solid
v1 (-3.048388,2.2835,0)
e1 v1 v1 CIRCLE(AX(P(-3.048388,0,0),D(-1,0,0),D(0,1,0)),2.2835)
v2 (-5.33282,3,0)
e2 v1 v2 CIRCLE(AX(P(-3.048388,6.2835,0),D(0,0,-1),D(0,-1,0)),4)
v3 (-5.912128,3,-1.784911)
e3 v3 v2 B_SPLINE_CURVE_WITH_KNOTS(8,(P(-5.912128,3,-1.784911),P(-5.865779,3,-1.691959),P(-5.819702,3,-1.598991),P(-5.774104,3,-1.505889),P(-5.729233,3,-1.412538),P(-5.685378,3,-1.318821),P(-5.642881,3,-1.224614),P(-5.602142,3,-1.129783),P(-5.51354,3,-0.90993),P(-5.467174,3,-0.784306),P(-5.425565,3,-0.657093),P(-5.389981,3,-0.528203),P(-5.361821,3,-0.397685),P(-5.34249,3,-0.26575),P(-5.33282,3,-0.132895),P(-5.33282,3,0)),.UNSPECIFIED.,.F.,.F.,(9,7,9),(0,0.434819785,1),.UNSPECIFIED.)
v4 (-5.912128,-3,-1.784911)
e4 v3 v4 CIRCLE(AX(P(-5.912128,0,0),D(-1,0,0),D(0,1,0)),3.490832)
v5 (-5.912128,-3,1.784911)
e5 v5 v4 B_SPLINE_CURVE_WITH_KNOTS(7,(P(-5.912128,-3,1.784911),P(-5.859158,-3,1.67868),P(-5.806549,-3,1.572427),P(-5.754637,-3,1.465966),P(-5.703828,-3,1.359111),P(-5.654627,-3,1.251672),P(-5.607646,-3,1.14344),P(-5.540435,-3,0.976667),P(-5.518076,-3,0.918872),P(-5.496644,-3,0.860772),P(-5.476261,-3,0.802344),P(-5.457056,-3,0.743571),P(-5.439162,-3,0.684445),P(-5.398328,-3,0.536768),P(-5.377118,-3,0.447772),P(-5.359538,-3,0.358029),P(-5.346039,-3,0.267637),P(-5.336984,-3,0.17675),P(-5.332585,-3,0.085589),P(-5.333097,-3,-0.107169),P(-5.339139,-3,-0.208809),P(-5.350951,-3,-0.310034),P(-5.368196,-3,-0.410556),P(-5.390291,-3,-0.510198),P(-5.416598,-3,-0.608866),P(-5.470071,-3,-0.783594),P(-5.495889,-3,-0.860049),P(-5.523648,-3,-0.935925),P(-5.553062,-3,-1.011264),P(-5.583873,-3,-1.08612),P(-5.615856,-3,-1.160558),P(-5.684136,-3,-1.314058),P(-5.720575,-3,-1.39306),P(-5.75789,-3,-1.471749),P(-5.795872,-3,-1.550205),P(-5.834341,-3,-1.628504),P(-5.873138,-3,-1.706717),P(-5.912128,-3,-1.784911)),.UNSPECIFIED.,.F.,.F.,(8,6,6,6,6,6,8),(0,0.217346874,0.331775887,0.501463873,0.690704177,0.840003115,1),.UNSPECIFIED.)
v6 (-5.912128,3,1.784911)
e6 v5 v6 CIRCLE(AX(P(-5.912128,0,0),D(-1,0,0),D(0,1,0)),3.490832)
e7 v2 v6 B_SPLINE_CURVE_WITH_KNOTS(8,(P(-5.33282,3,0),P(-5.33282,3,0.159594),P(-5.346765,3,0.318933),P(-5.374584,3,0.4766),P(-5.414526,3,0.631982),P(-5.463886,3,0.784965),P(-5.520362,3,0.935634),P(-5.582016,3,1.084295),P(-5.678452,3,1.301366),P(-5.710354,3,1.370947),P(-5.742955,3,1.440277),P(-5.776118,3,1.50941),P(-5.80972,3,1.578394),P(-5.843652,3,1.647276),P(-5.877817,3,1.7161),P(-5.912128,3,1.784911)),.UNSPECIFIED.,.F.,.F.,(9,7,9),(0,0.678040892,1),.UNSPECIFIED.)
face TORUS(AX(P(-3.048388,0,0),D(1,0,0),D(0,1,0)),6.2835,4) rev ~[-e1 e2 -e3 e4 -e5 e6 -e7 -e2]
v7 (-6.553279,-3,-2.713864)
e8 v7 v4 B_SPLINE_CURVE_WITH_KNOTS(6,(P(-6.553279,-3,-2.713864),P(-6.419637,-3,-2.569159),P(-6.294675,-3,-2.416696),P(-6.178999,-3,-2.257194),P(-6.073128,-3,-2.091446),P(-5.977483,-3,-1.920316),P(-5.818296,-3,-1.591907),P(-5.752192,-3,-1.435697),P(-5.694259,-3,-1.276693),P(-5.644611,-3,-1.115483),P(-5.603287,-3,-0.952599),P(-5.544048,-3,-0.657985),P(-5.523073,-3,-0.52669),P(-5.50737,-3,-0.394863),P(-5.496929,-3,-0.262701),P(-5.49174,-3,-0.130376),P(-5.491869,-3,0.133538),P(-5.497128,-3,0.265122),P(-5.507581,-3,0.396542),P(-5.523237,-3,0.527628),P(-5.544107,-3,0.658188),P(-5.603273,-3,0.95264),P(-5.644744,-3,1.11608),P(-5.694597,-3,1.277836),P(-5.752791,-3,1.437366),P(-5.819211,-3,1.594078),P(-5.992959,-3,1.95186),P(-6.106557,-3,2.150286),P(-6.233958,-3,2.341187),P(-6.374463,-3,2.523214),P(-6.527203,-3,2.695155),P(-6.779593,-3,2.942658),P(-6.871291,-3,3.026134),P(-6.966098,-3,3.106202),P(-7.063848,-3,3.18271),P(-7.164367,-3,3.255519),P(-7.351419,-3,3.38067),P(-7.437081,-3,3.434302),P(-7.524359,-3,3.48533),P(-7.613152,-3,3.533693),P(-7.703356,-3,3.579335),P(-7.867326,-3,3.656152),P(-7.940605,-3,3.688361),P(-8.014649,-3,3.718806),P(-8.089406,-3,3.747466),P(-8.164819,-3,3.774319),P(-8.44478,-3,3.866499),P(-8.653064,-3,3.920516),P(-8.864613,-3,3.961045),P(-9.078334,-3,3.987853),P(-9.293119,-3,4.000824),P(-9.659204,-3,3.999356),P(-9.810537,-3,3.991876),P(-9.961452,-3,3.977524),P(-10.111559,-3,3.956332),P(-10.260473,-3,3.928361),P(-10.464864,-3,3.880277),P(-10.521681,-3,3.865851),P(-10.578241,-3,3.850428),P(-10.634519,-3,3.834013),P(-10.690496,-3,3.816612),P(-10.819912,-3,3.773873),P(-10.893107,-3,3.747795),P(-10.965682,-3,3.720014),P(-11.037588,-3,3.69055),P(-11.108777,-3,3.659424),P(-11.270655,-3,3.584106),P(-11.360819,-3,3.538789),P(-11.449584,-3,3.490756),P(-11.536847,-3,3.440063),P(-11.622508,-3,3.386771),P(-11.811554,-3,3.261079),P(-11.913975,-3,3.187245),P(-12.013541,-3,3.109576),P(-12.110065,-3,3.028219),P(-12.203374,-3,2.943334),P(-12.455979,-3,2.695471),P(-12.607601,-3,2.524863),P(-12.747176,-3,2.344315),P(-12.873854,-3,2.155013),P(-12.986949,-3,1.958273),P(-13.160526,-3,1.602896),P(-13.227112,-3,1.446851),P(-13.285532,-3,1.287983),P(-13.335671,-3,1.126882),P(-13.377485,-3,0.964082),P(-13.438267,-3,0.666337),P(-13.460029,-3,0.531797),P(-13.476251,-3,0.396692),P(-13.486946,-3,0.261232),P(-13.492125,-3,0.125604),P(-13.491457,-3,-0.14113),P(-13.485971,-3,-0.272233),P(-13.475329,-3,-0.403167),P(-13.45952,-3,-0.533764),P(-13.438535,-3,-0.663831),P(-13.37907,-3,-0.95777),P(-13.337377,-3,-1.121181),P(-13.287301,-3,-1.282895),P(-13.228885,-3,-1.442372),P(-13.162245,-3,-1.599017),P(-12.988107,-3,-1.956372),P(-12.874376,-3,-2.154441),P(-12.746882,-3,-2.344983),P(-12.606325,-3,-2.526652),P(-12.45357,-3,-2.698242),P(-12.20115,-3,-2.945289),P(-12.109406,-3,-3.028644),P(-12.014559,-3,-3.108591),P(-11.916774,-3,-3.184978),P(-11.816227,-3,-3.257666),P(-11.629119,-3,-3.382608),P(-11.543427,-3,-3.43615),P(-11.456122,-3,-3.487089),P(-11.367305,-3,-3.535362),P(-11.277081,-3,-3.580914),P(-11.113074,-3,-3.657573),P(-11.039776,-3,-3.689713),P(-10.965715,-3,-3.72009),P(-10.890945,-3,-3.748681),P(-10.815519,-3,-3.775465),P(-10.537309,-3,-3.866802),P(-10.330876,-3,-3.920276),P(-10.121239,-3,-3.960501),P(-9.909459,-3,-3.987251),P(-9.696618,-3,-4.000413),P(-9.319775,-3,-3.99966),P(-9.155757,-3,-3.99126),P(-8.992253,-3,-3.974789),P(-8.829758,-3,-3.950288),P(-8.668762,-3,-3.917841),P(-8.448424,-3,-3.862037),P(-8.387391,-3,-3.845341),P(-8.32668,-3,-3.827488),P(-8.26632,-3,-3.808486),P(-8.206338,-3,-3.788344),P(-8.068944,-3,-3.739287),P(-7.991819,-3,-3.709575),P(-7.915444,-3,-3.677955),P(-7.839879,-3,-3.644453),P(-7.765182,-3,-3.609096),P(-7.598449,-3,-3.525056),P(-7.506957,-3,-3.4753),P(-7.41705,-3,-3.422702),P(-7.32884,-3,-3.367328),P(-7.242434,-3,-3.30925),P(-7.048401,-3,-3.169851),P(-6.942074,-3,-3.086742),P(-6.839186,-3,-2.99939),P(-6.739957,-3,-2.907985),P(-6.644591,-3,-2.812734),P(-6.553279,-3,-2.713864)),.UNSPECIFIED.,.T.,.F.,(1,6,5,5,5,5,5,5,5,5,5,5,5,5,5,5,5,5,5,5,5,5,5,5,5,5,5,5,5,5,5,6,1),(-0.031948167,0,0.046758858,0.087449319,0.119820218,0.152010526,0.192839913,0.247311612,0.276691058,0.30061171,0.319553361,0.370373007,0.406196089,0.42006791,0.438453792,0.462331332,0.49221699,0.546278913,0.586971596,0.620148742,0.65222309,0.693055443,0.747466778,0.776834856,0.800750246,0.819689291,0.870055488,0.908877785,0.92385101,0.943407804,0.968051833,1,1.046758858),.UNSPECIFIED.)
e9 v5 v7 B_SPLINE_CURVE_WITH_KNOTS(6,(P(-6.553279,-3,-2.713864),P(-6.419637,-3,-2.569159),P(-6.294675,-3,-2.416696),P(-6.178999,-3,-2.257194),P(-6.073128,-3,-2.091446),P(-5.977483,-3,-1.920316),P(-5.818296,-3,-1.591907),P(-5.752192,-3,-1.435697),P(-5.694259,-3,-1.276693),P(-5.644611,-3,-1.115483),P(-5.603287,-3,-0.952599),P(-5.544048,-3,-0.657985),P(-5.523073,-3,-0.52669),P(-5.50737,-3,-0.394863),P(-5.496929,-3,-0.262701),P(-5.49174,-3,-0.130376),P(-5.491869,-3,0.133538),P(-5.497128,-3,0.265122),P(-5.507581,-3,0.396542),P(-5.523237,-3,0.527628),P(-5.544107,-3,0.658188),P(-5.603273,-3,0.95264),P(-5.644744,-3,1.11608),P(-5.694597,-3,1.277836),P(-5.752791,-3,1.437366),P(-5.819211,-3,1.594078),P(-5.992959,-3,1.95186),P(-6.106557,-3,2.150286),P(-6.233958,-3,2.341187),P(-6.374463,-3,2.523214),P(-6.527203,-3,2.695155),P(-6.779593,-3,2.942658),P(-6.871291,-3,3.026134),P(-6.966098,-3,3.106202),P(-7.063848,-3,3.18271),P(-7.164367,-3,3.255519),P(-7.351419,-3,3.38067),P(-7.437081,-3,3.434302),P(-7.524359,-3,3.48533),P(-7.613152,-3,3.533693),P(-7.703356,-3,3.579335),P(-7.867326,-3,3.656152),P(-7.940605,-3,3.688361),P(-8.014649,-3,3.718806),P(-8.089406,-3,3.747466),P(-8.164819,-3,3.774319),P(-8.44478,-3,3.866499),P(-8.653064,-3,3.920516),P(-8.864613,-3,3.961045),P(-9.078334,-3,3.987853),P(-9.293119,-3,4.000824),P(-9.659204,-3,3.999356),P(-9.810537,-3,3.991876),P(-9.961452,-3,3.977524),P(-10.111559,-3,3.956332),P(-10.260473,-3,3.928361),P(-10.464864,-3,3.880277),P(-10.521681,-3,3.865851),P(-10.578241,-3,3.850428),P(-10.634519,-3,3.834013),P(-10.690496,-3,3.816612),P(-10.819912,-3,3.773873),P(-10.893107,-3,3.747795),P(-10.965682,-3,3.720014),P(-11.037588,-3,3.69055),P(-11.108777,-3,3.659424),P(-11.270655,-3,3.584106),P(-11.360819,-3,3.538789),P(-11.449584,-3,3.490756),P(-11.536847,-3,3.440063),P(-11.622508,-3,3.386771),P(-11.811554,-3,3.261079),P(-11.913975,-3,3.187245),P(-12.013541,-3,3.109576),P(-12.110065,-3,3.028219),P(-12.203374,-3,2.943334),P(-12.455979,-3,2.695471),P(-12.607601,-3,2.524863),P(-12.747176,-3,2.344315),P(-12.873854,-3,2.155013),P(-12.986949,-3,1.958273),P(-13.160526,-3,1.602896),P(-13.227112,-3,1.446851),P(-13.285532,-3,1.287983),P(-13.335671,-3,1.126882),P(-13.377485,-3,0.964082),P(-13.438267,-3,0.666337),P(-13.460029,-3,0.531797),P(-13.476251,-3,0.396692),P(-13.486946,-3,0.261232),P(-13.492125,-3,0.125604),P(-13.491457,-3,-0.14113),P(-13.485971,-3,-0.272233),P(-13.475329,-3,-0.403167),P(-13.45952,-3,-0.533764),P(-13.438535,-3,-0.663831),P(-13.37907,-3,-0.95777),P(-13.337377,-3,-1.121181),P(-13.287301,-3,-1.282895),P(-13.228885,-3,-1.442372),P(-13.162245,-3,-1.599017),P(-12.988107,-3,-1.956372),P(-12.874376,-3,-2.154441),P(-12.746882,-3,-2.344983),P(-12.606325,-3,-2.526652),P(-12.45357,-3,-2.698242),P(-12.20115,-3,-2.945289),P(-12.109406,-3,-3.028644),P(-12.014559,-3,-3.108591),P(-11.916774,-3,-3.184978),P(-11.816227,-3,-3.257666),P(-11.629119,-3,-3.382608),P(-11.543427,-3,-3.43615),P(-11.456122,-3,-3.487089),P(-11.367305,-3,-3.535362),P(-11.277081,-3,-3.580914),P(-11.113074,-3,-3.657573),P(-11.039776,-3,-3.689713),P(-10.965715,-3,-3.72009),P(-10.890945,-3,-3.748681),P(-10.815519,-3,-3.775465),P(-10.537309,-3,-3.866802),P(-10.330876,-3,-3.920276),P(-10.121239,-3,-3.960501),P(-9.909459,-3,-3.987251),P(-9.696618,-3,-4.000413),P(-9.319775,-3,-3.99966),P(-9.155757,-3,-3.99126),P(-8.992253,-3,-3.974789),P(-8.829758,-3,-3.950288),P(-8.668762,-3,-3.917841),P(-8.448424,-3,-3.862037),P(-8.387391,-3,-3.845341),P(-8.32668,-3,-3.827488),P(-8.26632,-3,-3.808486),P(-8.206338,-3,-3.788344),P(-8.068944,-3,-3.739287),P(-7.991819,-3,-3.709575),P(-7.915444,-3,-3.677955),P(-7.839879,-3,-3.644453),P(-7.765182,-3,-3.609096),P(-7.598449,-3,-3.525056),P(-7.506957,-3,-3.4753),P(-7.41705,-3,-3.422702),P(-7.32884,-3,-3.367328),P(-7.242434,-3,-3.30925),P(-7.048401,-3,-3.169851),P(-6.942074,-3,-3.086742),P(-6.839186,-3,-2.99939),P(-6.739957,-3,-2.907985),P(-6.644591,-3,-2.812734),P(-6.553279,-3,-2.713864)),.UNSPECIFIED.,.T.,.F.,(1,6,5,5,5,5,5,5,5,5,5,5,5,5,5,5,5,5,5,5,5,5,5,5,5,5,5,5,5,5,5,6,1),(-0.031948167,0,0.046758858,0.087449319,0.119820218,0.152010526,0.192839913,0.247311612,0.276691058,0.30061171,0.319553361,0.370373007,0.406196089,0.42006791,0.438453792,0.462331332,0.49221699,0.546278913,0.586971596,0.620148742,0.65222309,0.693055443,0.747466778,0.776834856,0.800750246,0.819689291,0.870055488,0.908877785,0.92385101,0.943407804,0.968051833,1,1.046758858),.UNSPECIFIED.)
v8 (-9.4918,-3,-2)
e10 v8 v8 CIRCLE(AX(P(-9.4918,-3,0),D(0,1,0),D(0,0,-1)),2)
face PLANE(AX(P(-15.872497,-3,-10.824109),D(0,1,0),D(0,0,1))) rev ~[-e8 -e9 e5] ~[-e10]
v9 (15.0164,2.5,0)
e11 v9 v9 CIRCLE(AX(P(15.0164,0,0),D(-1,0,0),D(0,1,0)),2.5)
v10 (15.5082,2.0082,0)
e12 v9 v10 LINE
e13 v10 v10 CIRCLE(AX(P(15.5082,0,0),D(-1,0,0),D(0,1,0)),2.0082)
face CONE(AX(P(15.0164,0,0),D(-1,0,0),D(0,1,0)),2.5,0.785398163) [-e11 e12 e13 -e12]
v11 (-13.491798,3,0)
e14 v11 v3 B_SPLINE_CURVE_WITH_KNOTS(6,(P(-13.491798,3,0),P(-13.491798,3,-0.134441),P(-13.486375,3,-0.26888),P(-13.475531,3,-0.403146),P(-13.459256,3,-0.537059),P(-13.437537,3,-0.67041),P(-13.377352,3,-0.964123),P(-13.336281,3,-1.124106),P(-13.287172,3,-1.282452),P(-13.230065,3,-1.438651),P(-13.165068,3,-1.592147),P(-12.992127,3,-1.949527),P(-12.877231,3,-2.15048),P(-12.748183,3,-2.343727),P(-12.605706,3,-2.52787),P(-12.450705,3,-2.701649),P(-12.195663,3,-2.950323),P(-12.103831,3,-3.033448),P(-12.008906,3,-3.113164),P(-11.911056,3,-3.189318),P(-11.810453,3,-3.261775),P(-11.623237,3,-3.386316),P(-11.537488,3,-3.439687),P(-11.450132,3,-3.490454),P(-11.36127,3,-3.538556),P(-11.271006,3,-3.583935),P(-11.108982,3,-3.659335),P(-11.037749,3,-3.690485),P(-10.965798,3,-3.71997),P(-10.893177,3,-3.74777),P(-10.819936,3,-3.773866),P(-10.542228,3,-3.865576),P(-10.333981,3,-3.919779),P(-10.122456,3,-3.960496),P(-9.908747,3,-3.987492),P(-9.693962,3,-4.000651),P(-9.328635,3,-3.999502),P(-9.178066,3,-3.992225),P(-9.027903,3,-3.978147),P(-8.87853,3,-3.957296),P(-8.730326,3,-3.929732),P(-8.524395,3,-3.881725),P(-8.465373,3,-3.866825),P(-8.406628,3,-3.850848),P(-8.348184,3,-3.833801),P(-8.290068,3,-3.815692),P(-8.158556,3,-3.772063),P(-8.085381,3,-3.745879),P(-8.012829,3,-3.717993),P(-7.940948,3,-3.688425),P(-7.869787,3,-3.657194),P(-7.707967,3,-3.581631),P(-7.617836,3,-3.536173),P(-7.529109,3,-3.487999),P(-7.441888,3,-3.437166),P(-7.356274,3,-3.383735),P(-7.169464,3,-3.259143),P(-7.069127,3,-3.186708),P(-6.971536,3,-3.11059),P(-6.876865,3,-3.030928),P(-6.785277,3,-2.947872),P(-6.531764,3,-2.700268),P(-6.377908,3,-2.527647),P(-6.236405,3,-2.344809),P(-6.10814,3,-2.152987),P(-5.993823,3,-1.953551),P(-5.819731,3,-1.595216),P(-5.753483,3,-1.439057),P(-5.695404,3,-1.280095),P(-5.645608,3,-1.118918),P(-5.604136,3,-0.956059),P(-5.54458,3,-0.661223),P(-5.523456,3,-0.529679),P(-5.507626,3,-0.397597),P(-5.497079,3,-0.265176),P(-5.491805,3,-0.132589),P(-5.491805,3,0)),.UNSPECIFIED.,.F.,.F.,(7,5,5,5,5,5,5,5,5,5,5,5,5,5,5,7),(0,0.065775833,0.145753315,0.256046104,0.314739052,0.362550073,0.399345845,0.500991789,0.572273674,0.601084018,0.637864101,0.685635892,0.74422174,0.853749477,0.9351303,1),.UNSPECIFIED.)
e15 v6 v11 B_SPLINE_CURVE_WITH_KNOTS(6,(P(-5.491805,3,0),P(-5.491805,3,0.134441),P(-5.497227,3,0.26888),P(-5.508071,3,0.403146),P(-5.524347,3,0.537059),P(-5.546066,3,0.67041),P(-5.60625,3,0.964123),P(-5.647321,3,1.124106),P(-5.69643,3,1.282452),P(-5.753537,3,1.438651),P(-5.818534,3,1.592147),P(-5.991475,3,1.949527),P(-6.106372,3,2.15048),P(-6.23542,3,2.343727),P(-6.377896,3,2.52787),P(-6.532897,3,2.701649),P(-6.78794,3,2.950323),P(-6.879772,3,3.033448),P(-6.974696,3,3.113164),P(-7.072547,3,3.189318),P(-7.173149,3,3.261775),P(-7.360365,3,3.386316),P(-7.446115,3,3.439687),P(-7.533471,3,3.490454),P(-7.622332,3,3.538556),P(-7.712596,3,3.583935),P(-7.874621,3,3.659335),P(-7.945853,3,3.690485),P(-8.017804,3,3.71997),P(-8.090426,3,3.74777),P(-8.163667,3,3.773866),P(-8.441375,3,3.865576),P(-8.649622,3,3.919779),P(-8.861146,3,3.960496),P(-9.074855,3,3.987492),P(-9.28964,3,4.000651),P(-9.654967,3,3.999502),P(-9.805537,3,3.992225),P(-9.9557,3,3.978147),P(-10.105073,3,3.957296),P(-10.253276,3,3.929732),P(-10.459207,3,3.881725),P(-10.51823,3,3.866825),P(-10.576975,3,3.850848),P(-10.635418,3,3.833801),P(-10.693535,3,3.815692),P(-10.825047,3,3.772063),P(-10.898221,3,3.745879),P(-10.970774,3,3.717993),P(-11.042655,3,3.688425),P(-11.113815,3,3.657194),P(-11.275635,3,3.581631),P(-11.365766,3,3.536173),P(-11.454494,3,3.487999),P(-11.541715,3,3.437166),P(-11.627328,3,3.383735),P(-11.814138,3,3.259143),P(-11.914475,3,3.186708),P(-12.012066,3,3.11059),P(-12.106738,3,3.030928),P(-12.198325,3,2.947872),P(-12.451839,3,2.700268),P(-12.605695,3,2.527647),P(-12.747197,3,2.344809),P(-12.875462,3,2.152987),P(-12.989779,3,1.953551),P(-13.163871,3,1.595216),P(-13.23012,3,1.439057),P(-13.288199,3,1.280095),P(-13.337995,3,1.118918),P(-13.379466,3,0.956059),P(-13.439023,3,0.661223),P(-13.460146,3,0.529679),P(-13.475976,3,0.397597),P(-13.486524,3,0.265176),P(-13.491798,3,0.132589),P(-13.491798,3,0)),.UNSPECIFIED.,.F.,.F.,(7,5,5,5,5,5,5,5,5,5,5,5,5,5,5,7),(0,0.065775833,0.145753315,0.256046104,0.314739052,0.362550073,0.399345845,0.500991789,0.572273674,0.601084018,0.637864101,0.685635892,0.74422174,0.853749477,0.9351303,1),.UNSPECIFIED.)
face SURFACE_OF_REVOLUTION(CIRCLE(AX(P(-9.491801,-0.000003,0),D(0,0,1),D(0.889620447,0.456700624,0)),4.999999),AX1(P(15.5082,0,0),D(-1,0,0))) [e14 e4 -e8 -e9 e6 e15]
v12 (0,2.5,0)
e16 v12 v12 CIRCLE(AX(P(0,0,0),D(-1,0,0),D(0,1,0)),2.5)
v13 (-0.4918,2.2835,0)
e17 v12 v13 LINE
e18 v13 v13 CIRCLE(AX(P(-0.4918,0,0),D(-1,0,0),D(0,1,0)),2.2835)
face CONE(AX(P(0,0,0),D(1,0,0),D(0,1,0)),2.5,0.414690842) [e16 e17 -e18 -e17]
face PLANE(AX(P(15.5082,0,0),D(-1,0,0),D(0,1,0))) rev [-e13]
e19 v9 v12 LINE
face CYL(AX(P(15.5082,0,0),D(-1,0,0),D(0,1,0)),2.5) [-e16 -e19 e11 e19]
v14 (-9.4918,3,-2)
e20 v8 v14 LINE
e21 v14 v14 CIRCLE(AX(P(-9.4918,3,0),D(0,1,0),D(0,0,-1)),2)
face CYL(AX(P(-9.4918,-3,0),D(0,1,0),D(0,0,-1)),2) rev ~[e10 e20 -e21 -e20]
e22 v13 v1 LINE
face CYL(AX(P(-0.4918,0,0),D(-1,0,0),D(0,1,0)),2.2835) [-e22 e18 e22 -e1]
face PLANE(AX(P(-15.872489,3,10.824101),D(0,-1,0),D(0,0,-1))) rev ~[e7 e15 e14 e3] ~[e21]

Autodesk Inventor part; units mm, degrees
ref_plane "YZ Plane" through (0, 0, 0) normal (1, 0, 0) x (0, 1, 0)
ref_plane "XZ Plane" through (0, 0, 0) normal (0, 1, 0) x (-1, 0, 0)
sketch "Sketch1" plane through (0, 0, 0) normal (0, 0, 1) x (1, 0, 0)
  line L0 (15.5082, 0) -> (15.5082, 2.5)
  line L1 (-0.4918, 2.2835) -> (-5.0437, 2.2835)
  line L2 (15.5082, 0) -> (-14.4918, 0)
  arc A0 (-5.0437, 2.2835) -> (-14.4918, 0) centre (-9.4918, 0) ccw
  line L3 (-21.5702, 0) -> (21.688, 0) projected
  line L4 (0, -1.2004) -> (0, 7.2022) projected
  line L5 (15.5082, 2.5) -> (0, 2.5)
  line L6 (0, 2.5) -> (-0.4918, 2.2835)
  line L7 (0, 2.5) -> (0, 0) construction
  line L8 (0, 2.5) -> (-5.1616, 2.5) construction
  dimension "d0" = 5
  dimension "d1" = 4.567
  dimension "d2" = 25
  dimension "d10" = 16
  dimension "d11" = 0.4918
  dimension "d18" = 5
revolve "Body1" add sketch "Sketch1" angle 360 about axis through (15.5082, 0, 0) along (-1, 0, 0)
ref_plane "Work Plane1" through (-4.4918, 0, 0) normal (1, 0, 0) x (0, 1, 0)
sketch "Sketch2" plane through (-4.4918, 0, 0) normal (1, 0, 0) x (0, 1, 0)
  arc A0 (3, -4) -> (3, 4) centre (0, 0) ccw
  line L0 (3, 4) -> (3, -4)
  circle A1 centre (0, 0) radius 2.5 projected
  line L1 (0, 0) -> (0, 4.0115)
  arc A2 (-3, 4) -> (-3, -4) centre (0, 0) ccw
  line L2 (-3, 4) -> (-3, -4)
  dimension "d3" = 10
  dimension "d4" = 3
extrude "Body2" cut sketch "Sketch2" against normal blind 10 contours L0 A0 | L2 A2
sketch "Sketch3" plane through (-9.4918, -3, 0) normal (0, -1, 0) x (1, 0, 0)
  circle A0 centre (0, 0) radius 4 projected
hole "Eye" at (-9.4918, -3, 0) direction (0, 1, 0) diameter 4 end through all
fillet "Fillet1" radius 4 1 edges at (-5.0437, -2.2835, 0)
thread "Thread" size "M5x0.8" designation "M5" class "6g" standard "GB Metric profile" length 16
chamfer "Chamfer1" distance 0.4918 angle 45 1 edges at (15.5082, -2.5, 0)
equation "\"d0\" = 0.5 * KOD"
equation "\"d1\" = BDM"
equation "\"d2\" = NLG"
equation "\"d10\" = GEL"
equation "\"d18\" = GD"
equation "\"d3\" = KOD"
equation "\"d4\" = 0.5 * SW"
equation "\"d5\" = KOD"
equation "\"d8\" = BOR"
equation "\"d9\" = RR"
equation "\"d21\" = GEL"
equation "\"NLG\" = 25"
equation "\"GD\" = NND"
equation "\"GAL\" = 0.61345 * PTC"
equation "\"GEL\" = 16"
equation "\"BDM\" = 4.567"
equation "\"KOD\" = 10"
equation "\"GUL\" = 0.61345 * PTC"
equation "\"SW\" = 6"
equation "\"BOR\" = 4"
equation "\"RR\" = 4"
equation "\"SPD\" = NND - 1.2269 * PTC"
equation "\"THREADDIA\" = 5"
equation "\"TOA\" = 30deg"
equation "\"FAWI\" = 45deg"
equation "\"PTC\" = 0.8"
equation "\"NND\" = 5"
equation "\"GD1\" = THREADDIA - 1.2269 * PTC"
properties part number "Eye bolt GB 798 M5 x 25" material "Steel, Mild"
